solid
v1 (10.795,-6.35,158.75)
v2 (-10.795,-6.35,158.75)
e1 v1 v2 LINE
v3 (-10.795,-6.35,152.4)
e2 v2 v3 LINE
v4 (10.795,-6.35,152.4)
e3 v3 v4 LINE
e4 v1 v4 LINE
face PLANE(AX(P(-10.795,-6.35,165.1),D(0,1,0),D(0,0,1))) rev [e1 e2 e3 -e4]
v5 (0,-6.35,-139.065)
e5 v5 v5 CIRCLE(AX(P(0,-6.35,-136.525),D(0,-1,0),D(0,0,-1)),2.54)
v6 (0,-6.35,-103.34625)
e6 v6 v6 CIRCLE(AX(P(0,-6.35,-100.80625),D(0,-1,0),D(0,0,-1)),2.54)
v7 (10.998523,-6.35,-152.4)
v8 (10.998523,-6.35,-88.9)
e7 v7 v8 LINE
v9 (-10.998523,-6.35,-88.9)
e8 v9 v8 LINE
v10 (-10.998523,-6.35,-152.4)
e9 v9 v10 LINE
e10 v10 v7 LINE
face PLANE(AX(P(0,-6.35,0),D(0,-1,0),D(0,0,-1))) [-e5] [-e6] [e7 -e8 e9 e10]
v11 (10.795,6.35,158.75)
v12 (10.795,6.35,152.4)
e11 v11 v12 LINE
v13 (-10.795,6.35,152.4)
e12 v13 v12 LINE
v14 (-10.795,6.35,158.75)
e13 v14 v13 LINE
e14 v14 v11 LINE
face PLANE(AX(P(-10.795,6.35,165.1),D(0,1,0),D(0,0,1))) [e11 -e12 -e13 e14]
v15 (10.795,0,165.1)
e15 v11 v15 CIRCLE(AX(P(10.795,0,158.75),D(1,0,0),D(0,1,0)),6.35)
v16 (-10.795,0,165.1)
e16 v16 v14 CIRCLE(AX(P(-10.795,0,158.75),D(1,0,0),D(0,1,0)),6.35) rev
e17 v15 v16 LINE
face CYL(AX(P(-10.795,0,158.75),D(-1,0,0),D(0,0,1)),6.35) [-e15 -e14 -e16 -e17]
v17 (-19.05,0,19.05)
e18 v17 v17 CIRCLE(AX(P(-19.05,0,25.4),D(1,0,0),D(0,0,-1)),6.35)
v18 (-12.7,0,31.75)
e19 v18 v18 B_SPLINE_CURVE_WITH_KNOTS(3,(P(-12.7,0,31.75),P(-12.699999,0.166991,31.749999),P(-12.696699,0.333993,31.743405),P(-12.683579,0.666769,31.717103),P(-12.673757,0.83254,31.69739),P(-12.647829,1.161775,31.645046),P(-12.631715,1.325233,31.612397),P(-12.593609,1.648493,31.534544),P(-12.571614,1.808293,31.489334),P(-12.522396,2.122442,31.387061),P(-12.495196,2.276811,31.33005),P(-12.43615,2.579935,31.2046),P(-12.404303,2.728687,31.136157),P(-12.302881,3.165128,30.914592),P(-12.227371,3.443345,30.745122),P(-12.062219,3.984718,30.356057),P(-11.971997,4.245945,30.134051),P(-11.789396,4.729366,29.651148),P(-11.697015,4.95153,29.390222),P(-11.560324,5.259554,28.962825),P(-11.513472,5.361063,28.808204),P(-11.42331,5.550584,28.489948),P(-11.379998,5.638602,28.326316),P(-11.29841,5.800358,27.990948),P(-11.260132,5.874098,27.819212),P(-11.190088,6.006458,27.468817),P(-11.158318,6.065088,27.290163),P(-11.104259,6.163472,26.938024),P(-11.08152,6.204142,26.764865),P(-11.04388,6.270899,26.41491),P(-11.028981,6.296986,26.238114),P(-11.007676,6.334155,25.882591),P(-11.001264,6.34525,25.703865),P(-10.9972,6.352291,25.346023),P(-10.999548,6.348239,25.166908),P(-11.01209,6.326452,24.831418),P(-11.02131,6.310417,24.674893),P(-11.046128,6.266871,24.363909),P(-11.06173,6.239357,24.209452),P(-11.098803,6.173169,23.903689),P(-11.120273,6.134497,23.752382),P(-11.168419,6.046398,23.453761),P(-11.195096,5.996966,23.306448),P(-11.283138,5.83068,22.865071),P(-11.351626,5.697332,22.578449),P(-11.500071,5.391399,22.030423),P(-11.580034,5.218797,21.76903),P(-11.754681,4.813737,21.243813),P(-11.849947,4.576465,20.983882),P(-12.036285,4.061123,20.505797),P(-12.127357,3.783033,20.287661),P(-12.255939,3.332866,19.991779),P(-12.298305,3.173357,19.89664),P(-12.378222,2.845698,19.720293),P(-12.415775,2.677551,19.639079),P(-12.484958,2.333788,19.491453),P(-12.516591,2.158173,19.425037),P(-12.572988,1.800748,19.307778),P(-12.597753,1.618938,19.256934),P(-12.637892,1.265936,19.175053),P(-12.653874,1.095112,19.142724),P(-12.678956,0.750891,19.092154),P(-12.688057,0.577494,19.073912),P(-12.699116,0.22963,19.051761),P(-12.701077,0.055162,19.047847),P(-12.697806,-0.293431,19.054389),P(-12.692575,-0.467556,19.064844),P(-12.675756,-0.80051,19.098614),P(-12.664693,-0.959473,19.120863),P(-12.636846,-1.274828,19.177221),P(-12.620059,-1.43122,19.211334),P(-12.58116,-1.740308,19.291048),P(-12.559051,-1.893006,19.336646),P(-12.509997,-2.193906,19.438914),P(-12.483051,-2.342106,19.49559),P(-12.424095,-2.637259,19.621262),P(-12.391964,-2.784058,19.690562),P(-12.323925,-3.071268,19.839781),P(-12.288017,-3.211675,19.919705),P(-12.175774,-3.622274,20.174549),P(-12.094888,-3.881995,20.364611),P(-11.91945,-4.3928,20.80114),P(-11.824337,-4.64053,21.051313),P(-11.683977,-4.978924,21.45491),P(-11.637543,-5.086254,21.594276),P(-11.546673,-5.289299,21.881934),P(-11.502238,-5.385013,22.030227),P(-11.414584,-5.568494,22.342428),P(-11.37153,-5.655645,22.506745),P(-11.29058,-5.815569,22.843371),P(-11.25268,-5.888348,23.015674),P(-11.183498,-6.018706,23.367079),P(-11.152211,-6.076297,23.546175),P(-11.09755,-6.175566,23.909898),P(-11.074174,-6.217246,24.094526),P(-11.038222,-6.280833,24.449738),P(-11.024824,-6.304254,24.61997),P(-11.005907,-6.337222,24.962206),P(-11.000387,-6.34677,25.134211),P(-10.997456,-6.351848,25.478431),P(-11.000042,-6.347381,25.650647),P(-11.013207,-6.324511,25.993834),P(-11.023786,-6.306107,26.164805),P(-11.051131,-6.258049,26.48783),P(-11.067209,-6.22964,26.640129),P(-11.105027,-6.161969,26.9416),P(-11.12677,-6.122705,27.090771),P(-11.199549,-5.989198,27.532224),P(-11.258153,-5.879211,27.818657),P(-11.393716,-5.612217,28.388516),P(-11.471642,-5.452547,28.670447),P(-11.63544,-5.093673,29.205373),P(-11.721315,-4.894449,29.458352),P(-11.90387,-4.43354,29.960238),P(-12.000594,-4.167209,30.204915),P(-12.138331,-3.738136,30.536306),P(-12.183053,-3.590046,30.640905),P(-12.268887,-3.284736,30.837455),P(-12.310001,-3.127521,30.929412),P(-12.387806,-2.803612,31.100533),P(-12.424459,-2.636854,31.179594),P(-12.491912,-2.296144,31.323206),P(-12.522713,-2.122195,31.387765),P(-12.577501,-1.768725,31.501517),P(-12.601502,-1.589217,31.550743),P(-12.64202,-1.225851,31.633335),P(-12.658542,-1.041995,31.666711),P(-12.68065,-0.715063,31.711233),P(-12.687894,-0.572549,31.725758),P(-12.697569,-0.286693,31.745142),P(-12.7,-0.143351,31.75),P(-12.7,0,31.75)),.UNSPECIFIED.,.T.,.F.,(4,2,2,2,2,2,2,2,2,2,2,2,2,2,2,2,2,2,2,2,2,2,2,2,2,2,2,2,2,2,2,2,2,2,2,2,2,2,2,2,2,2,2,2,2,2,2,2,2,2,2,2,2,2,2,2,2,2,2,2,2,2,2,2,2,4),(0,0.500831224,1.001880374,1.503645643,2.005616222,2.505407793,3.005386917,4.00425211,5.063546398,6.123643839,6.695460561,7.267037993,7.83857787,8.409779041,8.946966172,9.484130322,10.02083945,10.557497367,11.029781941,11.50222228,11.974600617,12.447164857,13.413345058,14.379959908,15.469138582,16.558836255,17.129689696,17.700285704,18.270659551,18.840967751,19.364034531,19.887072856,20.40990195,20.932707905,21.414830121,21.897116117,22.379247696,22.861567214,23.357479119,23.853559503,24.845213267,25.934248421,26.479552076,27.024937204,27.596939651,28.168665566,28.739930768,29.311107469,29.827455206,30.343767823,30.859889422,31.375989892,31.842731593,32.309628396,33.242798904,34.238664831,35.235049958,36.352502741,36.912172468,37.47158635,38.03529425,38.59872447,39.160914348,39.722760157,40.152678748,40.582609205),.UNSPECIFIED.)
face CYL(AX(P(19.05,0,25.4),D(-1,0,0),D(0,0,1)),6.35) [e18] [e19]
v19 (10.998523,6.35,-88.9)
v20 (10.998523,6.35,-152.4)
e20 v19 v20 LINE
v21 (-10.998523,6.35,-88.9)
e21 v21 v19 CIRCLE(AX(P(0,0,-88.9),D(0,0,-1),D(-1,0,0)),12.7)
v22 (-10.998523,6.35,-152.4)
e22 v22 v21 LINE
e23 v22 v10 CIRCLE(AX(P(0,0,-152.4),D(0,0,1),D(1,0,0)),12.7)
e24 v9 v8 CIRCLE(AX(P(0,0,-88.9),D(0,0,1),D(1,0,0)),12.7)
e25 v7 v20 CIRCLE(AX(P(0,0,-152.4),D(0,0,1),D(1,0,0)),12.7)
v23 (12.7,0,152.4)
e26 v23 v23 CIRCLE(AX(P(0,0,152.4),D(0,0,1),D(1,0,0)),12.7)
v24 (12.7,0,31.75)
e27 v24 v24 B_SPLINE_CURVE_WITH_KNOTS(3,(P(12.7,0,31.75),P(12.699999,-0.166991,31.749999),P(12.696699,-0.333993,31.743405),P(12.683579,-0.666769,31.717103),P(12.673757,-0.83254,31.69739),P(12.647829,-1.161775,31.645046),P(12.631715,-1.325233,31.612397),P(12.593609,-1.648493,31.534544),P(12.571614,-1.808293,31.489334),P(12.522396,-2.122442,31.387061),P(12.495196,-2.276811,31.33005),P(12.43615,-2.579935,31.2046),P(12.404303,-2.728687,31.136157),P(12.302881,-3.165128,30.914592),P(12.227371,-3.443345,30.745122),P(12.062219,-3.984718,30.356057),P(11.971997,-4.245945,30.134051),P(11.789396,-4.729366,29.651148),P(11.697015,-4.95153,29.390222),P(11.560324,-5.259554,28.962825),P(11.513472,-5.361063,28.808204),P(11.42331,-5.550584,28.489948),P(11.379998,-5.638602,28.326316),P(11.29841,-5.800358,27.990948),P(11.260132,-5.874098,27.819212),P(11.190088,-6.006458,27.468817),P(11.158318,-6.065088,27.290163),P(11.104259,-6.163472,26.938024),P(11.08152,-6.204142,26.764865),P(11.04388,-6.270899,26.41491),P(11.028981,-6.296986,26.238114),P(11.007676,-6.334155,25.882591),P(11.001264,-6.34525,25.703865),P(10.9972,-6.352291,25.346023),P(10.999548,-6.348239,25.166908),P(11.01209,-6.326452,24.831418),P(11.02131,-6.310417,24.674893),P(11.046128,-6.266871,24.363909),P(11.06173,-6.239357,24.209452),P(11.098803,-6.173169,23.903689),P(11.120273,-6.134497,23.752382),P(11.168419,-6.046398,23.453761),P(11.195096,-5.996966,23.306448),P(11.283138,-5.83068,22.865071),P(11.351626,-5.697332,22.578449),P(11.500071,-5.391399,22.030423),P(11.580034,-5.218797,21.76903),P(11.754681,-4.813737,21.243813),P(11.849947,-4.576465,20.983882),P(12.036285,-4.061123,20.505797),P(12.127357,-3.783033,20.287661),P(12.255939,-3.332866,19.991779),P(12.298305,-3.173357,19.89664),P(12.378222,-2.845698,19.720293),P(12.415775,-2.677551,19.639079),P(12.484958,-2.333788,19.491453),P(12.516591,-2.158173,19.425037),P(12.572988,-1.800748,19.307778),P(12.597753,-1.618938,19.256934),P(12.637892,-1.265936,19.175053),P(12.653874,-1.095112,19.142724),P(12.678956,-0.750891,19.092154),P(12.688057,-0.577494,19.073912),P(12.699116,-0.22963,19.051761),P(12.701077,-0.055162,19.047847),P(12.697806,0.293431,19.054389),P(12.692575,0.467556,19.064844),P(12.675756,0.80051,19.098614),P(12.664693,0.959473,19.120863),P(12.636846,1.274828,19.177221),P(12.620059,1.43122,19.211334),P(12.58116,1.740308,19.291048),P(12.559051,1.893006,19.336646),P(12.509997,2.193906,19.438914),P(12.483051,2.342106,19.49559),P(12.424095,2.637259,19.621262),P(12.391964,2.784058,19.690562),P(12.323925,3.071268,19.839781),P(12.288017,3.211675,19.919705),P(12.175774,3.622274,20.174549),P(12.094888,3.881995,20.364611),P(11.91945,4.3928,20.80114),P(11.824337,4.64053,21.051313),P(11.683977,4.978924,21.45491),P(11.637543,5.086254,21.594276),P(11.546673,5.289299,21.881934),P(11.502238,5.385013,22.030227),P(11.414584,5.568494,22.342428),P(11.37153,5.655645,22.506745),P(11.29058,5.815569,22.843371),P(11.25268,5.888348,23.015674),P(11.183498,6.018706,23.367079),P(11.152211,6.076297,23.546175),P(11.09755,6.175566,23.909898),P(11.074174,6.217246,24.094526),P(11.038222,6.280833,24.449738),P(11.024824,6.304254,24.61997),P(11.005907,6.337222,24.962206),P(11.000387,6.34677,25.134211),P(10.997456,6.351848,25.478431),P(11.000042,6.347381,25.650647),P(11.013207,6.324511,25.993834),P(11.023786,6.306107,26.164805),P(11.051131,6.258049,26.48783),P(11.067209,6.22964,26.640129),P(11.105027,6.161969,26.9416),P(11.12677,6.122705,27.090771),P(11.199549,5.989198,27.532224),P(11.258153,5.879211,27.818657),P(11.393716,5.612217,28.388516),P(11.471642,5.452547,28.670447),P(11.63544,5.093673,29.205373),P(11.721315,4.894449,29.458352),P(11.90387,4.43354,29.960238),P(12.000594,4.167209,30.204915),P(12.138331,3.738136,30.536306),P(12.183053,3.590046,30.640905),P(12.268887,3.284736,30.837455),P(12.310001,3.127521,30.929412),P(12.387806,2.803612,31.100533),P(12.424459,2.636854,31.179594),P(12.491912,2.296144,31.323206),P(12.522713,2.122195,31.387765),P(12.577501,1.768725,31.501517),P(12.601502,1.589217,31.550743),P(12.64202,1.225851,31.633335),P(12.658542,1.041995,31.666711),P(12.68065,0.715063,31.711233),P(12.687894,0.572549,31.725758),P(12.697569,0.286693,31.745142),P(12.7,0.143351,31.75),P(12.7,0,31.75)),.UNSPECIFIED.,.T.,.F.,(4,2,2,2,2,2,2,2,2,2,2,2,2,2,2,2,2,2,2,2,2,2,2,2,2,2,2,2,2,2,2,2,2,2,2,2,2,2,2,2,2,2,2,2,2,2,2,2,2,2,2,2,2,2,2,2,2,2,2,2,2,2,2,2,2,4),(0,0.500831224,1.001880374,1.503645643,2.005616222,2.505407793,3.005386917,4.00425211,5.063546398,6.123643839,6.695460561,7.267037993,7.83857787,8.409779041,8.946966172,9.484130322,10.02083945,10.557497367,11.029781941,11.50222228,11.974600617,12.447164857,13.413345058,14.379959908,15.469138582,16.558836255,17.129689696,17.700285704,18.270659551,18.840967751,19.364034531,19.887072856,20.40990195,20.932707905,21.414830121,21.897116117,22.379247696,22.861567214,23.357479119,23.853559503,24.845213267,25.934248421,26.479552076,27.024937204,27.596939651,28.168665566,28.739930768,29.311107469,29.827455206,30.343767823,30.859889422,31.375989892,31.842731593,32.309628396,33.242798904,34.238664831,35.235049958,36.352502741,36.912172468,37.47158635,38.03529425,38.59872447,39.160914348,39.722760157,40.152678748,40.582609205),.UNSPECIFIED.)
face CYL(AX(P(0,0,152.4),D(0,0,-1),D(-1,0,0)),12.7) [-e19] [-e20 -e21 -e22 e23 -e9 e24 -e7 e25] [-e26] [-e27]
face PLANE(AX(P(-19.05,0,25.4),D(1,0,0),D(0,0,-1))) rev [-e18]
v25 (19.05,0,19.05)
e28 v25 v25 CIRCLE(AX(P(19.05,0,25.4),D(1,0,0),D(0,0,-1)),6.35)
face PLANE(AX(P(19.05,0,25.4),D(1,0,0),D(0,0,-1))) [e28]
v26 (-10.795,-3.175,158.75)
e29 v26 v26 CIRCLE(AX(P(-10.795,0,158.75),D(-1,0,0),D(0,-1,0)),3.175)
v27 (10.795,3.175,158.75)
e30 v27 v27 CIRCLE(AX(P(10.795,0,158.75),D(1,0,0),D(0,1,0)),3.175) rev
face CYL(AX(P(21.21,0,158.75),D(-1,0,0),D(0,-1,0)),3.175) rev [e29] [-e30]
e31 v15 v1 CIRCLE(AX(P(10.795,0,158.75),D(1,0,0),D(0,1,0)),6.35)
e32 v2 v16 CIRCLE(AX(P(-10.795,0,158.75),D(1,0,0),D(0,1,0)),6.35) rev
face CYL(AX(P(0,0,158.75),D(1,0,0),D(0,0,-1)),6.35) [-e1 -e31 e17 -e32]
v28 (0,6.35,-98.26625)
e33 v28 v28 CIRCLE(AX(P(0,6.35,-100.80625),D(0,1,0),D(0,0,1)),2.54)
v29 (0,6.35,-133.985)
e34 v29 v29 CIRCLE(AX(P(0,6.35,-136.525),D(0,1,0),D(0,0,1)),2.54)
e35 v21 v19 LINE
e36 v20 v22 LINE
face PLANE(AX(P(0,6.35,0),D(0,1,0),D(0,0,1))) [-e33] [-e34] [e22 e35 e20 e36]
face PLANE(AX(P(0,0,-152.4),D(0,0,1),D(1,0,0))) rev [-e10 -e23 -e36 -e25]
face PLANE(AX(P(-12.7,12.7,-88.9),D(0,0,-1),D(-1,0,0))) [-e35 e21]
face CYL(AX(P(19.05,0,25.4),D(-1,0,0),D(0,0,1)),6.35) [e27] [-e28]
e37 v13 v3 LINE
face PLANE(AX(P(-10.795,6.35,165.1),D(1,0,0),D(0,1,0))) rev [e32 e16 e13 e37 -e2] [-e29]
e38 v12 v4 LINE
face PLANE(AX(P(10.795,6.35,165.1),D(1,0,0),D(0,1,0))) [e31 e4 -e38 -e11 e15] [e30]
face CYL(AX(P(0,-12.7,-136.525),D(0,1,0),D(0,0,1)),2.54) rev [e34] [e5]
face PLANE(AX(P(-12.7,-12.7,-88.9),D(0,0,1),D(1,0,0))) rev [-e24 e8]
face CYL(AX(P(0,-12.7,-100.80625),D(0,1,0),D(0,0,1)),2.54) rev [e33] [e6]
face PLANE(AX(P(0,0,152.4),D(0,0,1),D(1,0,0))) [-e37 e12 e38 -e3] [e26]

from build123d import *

# Parameters (mm, degrees)
SKETCH1_R                = 12.7
BOSS_EXTRUDE3_DEPTH      = 152.4
SKETCH9_R                = 6.35
BOSS_EXTRUDE6_DEPTH      = 19.05
SKETCH16_W               = 25.4
SKETCH16_H               = 63.5
CUT_EXTRUDE2_DEPTH       = 155.762931731
SKETCH17_W               = 25.4
SKETCH17_H               = 63.5
CUT_EXTRUDE3_DEPTH       = 155.762931731
SKETCH19_R               = 2.54
CUT_EXTRUDE5_DEPTH       = 155.762931731
SKETCH21_W               = 21.59
SKETCH21_H               = 12.7
BOSS_EXTRUDE8_DEPTH      = 12.7
BOSS_EXTRUDE9_DEPTH      = 6.35
SKETCH25_R               = 3.175
CUT_EXTRUDE7_DEPTH       = 21.59
SKETCH29_R               = 2.921
BOSS_EXTRUDE10_DEPTH     = 35.814
FILLET2_R                = 6.35
FILLET3_R                = 6.35
SKETCH31_W               = 63.5
SKETCH31_H               = 63.5
BOSS_EXTRUDE11_DEPTH     = 10.16
SKETCH32_W               = 76.52614712
SKETCH32_H               = 17.415789338
CUT_EXTRUDE8_DEPTH       = 195.047688304
SKETCH33_W               = 10.16
SKETCH33_H               = 12.7
CUT_EXTRUDE9_DEPTH       = 168.793532357
CUT_EXTRUDE11_DEPTH      = 169.255829122
CUT_EXTRUDE11_DEPTH_BACK = 169.255829122
SKETCH35_R               = 2.921


with BuildPart() as part:
    # Sketch1 → Boss-Extrude3 (new, symmetric)
    with BuildSketch(Plane.XY):
        with Locations(Location((0, 0, 0), (0, 0, 180))):
            Circle(SKETCH1_R)
    extrude(amount=BOSS_EXTRUDE3_DEPTH, both=True)

    # Sketch9 → Boss-Extrude6 (add, symmetric)
    with BuildSketch(Plane(origin=(0, 0, 0), x_dir=(0, 0, -1), z_dir=(1, 0, 0))):
        with Locations((-25.4, 0)):
            Circle(SKETCH9_R)
    extrude(amount=BOSS_EXTRUDE6_DEPTH, both=True)

    # Sketch16 → Cut-Extrude2 (cut, through all)
    with BuildSketch(Plane(origin=(0, -6.35, 0), x_dir=(1, 0, 0), z_dir=(0, 1, 0))):
        with Locations((0, 120.65)):
            Rectangle(SKETCH16_W, SKETCH16_H)
    extrude(amount=-CUT_EXTRUDE2_DEPTH, mode=Mode.SUBTRACT)

    # Sketch17 → Cut-Extrude3 (cut, through all)
    with BuildSketch(Plane(origin=(0, 6.35, 0), x_dir=(1, 0, 0), z_dir=(0, 1, 0))):
        with Locations((0, 120.65)):
            Rectangle(SKETCH17_W, SKETCH17_H)
    extrude(amount=CUT_EXTRUDE3_DEPTH, mode=Mode.SUBTRACT)

    # Sketch19 → Cut-Extrude5 (cut, through all)
    with BuildSketch(Plane(origin=(0, 6.35, 0), x_dir=(1, 0, 0), z_dir=(0, 1, 0))):
        with Locations(Location((0, 100.80625, 0), (0, 0, 270))):
            Circle(SKETCH19_R)
        with Locations(Location((0, 136.525, 0), (0, 0, 270))):
            Circle(SKETCH19_R)
    extrude(amount=-CUT_EXTRUDE5_DEPTH, mode=Mode.SUBTRACT)

    # Sketch21 → Boss-Extrude8 (add)
    with BuildSketch(Plane.XY.offset(152.4)):
        Rectangle(SKETCH21_W, SKETCH21_H)
    extrude(amount=BOSS_EXTRUDE8_DEPTH)

    # Sketch25 → Cut-Extrude7 (cut)
    with BuildSketch(Plane.ZY.offset(10.795)):
        with Locations(Location((158.75, 0, 0), (0, 0, 270))):
            Circle(SKETCH25_R)
    extrude(amount=-CUT_EXTRUDE7_DEPTH, mode=Mode.SUBTRACT)

    # Fillet3
    fillet3_edges = [part.edges().sort_by_distance(p)[0] for p in [
        (0, -6.35, 165.1),
        (0, 6.35, 165.1),
    ]]
    fillet(fillet3_edges, radius=FILLET3_R - 0.0001)  # a hair under: the kernel refuses the full size


with BuildPart() as body_2:
    # Sketch27 → Boss-Extrude9 (new, symmetric)
    with BuildSketch(Plane(origin=(0, 0, 0), x_dir=(1, 0, 0), z_dir=(0, 1, 0))):
        Polygon((0, -165.354), (11.049, -165.354), (11.049, -152.654), (21.209, -152.654), (21.209, -170.434), (-21.209, -170.434), (-21.209, -152.654), (-11.049, -152.654), (-11.049, -165.354), align=None)
    extrude(amount=BOSS_EXTRUDE9_DEPTH, both=True)

    # Sketch29 → Boss-Extrude10 (add)
    with BuildSketch(Plane.ZY.offset(21.209)):
        with Locations((158.827896988, 0)):
            Circle(SKETCH29_R)
    extrude(amount=-BOSS_EXTRUDE10_DEPTH)

    # Fillet2
    fillet2_edges = [body_2.edges().sort_by_distance(p)[0] for p in [
        (16.129, -6.35, 152.654),
        (16.129, 6.35, 152.654),
        (-16.129, -6.35, 152.654),
        (-16.129, 6.35, 152.654),
    ]]
    fillet(fillet2_edges, radius=FILLET2_R - 0.0001)  # a hair under: the kernel refuses the full size

    # Sketch31 → Boss-Extrude11 (add)
    with BuildSketch(Plane.XY.offset(170.434)):
        Rectangle(SKETCH31_W, SKETCH31_H)
    extrude(amount=BOSS_EXTRUDE11_DEPTH)

    # Sketch32 → Cut-Extrude8 (cut, through all)
    with BuildSketch(Plane(origin=(0, 31.75, 0), x_dir=(1, 0, 0), z_dir=(0, 1, 0))):
        with Locations((-0.932221908, -174.061894669)):
            Rectangle(SKETCH32_W, SKETCH32_H)
    extrude(amount=-CUT_EXTRUDE8_DEPTH, mode=Mode.SUBTRACT)

    # Sketch33 → Cut-Extrude9 (cut, through all)
    with BuildSketch(Plane(origin=(0, 6.35, 0), x_dir=(1, 0, 0), z_dir=(0, 1, 0))):
        with Locations((-16.129, -159.004)):
            Rectangle(SKETCH33_W, SKETCH33_H)
        with Locations((16.129, -159.004)):
            Rectangle(SKETCH33_W, SKETCH33_H)
    extrude(amount=-CUT_EXTRUDE9_DEPTH, mode=Mode.SUBTRACT)

    # Sketch35 → Cut-Extrude11 (cut, two sides: drawn at the far end of the back side and taken through both)
    with BuildSketch(Plane.ZY.offset(10.795).offset(-CUT_EXTRUDE11_DEPTH_BACK)):
        with Locations((158.827896988, 0)):
            Circle(SKETCH35_R)
    extrude(amount=CUT_EXTRUDE11_DEPTH + CUT_EXTRUDE11_DEPTH_BACK, mode=Mode.SUBTRACT)


solid = part.part
